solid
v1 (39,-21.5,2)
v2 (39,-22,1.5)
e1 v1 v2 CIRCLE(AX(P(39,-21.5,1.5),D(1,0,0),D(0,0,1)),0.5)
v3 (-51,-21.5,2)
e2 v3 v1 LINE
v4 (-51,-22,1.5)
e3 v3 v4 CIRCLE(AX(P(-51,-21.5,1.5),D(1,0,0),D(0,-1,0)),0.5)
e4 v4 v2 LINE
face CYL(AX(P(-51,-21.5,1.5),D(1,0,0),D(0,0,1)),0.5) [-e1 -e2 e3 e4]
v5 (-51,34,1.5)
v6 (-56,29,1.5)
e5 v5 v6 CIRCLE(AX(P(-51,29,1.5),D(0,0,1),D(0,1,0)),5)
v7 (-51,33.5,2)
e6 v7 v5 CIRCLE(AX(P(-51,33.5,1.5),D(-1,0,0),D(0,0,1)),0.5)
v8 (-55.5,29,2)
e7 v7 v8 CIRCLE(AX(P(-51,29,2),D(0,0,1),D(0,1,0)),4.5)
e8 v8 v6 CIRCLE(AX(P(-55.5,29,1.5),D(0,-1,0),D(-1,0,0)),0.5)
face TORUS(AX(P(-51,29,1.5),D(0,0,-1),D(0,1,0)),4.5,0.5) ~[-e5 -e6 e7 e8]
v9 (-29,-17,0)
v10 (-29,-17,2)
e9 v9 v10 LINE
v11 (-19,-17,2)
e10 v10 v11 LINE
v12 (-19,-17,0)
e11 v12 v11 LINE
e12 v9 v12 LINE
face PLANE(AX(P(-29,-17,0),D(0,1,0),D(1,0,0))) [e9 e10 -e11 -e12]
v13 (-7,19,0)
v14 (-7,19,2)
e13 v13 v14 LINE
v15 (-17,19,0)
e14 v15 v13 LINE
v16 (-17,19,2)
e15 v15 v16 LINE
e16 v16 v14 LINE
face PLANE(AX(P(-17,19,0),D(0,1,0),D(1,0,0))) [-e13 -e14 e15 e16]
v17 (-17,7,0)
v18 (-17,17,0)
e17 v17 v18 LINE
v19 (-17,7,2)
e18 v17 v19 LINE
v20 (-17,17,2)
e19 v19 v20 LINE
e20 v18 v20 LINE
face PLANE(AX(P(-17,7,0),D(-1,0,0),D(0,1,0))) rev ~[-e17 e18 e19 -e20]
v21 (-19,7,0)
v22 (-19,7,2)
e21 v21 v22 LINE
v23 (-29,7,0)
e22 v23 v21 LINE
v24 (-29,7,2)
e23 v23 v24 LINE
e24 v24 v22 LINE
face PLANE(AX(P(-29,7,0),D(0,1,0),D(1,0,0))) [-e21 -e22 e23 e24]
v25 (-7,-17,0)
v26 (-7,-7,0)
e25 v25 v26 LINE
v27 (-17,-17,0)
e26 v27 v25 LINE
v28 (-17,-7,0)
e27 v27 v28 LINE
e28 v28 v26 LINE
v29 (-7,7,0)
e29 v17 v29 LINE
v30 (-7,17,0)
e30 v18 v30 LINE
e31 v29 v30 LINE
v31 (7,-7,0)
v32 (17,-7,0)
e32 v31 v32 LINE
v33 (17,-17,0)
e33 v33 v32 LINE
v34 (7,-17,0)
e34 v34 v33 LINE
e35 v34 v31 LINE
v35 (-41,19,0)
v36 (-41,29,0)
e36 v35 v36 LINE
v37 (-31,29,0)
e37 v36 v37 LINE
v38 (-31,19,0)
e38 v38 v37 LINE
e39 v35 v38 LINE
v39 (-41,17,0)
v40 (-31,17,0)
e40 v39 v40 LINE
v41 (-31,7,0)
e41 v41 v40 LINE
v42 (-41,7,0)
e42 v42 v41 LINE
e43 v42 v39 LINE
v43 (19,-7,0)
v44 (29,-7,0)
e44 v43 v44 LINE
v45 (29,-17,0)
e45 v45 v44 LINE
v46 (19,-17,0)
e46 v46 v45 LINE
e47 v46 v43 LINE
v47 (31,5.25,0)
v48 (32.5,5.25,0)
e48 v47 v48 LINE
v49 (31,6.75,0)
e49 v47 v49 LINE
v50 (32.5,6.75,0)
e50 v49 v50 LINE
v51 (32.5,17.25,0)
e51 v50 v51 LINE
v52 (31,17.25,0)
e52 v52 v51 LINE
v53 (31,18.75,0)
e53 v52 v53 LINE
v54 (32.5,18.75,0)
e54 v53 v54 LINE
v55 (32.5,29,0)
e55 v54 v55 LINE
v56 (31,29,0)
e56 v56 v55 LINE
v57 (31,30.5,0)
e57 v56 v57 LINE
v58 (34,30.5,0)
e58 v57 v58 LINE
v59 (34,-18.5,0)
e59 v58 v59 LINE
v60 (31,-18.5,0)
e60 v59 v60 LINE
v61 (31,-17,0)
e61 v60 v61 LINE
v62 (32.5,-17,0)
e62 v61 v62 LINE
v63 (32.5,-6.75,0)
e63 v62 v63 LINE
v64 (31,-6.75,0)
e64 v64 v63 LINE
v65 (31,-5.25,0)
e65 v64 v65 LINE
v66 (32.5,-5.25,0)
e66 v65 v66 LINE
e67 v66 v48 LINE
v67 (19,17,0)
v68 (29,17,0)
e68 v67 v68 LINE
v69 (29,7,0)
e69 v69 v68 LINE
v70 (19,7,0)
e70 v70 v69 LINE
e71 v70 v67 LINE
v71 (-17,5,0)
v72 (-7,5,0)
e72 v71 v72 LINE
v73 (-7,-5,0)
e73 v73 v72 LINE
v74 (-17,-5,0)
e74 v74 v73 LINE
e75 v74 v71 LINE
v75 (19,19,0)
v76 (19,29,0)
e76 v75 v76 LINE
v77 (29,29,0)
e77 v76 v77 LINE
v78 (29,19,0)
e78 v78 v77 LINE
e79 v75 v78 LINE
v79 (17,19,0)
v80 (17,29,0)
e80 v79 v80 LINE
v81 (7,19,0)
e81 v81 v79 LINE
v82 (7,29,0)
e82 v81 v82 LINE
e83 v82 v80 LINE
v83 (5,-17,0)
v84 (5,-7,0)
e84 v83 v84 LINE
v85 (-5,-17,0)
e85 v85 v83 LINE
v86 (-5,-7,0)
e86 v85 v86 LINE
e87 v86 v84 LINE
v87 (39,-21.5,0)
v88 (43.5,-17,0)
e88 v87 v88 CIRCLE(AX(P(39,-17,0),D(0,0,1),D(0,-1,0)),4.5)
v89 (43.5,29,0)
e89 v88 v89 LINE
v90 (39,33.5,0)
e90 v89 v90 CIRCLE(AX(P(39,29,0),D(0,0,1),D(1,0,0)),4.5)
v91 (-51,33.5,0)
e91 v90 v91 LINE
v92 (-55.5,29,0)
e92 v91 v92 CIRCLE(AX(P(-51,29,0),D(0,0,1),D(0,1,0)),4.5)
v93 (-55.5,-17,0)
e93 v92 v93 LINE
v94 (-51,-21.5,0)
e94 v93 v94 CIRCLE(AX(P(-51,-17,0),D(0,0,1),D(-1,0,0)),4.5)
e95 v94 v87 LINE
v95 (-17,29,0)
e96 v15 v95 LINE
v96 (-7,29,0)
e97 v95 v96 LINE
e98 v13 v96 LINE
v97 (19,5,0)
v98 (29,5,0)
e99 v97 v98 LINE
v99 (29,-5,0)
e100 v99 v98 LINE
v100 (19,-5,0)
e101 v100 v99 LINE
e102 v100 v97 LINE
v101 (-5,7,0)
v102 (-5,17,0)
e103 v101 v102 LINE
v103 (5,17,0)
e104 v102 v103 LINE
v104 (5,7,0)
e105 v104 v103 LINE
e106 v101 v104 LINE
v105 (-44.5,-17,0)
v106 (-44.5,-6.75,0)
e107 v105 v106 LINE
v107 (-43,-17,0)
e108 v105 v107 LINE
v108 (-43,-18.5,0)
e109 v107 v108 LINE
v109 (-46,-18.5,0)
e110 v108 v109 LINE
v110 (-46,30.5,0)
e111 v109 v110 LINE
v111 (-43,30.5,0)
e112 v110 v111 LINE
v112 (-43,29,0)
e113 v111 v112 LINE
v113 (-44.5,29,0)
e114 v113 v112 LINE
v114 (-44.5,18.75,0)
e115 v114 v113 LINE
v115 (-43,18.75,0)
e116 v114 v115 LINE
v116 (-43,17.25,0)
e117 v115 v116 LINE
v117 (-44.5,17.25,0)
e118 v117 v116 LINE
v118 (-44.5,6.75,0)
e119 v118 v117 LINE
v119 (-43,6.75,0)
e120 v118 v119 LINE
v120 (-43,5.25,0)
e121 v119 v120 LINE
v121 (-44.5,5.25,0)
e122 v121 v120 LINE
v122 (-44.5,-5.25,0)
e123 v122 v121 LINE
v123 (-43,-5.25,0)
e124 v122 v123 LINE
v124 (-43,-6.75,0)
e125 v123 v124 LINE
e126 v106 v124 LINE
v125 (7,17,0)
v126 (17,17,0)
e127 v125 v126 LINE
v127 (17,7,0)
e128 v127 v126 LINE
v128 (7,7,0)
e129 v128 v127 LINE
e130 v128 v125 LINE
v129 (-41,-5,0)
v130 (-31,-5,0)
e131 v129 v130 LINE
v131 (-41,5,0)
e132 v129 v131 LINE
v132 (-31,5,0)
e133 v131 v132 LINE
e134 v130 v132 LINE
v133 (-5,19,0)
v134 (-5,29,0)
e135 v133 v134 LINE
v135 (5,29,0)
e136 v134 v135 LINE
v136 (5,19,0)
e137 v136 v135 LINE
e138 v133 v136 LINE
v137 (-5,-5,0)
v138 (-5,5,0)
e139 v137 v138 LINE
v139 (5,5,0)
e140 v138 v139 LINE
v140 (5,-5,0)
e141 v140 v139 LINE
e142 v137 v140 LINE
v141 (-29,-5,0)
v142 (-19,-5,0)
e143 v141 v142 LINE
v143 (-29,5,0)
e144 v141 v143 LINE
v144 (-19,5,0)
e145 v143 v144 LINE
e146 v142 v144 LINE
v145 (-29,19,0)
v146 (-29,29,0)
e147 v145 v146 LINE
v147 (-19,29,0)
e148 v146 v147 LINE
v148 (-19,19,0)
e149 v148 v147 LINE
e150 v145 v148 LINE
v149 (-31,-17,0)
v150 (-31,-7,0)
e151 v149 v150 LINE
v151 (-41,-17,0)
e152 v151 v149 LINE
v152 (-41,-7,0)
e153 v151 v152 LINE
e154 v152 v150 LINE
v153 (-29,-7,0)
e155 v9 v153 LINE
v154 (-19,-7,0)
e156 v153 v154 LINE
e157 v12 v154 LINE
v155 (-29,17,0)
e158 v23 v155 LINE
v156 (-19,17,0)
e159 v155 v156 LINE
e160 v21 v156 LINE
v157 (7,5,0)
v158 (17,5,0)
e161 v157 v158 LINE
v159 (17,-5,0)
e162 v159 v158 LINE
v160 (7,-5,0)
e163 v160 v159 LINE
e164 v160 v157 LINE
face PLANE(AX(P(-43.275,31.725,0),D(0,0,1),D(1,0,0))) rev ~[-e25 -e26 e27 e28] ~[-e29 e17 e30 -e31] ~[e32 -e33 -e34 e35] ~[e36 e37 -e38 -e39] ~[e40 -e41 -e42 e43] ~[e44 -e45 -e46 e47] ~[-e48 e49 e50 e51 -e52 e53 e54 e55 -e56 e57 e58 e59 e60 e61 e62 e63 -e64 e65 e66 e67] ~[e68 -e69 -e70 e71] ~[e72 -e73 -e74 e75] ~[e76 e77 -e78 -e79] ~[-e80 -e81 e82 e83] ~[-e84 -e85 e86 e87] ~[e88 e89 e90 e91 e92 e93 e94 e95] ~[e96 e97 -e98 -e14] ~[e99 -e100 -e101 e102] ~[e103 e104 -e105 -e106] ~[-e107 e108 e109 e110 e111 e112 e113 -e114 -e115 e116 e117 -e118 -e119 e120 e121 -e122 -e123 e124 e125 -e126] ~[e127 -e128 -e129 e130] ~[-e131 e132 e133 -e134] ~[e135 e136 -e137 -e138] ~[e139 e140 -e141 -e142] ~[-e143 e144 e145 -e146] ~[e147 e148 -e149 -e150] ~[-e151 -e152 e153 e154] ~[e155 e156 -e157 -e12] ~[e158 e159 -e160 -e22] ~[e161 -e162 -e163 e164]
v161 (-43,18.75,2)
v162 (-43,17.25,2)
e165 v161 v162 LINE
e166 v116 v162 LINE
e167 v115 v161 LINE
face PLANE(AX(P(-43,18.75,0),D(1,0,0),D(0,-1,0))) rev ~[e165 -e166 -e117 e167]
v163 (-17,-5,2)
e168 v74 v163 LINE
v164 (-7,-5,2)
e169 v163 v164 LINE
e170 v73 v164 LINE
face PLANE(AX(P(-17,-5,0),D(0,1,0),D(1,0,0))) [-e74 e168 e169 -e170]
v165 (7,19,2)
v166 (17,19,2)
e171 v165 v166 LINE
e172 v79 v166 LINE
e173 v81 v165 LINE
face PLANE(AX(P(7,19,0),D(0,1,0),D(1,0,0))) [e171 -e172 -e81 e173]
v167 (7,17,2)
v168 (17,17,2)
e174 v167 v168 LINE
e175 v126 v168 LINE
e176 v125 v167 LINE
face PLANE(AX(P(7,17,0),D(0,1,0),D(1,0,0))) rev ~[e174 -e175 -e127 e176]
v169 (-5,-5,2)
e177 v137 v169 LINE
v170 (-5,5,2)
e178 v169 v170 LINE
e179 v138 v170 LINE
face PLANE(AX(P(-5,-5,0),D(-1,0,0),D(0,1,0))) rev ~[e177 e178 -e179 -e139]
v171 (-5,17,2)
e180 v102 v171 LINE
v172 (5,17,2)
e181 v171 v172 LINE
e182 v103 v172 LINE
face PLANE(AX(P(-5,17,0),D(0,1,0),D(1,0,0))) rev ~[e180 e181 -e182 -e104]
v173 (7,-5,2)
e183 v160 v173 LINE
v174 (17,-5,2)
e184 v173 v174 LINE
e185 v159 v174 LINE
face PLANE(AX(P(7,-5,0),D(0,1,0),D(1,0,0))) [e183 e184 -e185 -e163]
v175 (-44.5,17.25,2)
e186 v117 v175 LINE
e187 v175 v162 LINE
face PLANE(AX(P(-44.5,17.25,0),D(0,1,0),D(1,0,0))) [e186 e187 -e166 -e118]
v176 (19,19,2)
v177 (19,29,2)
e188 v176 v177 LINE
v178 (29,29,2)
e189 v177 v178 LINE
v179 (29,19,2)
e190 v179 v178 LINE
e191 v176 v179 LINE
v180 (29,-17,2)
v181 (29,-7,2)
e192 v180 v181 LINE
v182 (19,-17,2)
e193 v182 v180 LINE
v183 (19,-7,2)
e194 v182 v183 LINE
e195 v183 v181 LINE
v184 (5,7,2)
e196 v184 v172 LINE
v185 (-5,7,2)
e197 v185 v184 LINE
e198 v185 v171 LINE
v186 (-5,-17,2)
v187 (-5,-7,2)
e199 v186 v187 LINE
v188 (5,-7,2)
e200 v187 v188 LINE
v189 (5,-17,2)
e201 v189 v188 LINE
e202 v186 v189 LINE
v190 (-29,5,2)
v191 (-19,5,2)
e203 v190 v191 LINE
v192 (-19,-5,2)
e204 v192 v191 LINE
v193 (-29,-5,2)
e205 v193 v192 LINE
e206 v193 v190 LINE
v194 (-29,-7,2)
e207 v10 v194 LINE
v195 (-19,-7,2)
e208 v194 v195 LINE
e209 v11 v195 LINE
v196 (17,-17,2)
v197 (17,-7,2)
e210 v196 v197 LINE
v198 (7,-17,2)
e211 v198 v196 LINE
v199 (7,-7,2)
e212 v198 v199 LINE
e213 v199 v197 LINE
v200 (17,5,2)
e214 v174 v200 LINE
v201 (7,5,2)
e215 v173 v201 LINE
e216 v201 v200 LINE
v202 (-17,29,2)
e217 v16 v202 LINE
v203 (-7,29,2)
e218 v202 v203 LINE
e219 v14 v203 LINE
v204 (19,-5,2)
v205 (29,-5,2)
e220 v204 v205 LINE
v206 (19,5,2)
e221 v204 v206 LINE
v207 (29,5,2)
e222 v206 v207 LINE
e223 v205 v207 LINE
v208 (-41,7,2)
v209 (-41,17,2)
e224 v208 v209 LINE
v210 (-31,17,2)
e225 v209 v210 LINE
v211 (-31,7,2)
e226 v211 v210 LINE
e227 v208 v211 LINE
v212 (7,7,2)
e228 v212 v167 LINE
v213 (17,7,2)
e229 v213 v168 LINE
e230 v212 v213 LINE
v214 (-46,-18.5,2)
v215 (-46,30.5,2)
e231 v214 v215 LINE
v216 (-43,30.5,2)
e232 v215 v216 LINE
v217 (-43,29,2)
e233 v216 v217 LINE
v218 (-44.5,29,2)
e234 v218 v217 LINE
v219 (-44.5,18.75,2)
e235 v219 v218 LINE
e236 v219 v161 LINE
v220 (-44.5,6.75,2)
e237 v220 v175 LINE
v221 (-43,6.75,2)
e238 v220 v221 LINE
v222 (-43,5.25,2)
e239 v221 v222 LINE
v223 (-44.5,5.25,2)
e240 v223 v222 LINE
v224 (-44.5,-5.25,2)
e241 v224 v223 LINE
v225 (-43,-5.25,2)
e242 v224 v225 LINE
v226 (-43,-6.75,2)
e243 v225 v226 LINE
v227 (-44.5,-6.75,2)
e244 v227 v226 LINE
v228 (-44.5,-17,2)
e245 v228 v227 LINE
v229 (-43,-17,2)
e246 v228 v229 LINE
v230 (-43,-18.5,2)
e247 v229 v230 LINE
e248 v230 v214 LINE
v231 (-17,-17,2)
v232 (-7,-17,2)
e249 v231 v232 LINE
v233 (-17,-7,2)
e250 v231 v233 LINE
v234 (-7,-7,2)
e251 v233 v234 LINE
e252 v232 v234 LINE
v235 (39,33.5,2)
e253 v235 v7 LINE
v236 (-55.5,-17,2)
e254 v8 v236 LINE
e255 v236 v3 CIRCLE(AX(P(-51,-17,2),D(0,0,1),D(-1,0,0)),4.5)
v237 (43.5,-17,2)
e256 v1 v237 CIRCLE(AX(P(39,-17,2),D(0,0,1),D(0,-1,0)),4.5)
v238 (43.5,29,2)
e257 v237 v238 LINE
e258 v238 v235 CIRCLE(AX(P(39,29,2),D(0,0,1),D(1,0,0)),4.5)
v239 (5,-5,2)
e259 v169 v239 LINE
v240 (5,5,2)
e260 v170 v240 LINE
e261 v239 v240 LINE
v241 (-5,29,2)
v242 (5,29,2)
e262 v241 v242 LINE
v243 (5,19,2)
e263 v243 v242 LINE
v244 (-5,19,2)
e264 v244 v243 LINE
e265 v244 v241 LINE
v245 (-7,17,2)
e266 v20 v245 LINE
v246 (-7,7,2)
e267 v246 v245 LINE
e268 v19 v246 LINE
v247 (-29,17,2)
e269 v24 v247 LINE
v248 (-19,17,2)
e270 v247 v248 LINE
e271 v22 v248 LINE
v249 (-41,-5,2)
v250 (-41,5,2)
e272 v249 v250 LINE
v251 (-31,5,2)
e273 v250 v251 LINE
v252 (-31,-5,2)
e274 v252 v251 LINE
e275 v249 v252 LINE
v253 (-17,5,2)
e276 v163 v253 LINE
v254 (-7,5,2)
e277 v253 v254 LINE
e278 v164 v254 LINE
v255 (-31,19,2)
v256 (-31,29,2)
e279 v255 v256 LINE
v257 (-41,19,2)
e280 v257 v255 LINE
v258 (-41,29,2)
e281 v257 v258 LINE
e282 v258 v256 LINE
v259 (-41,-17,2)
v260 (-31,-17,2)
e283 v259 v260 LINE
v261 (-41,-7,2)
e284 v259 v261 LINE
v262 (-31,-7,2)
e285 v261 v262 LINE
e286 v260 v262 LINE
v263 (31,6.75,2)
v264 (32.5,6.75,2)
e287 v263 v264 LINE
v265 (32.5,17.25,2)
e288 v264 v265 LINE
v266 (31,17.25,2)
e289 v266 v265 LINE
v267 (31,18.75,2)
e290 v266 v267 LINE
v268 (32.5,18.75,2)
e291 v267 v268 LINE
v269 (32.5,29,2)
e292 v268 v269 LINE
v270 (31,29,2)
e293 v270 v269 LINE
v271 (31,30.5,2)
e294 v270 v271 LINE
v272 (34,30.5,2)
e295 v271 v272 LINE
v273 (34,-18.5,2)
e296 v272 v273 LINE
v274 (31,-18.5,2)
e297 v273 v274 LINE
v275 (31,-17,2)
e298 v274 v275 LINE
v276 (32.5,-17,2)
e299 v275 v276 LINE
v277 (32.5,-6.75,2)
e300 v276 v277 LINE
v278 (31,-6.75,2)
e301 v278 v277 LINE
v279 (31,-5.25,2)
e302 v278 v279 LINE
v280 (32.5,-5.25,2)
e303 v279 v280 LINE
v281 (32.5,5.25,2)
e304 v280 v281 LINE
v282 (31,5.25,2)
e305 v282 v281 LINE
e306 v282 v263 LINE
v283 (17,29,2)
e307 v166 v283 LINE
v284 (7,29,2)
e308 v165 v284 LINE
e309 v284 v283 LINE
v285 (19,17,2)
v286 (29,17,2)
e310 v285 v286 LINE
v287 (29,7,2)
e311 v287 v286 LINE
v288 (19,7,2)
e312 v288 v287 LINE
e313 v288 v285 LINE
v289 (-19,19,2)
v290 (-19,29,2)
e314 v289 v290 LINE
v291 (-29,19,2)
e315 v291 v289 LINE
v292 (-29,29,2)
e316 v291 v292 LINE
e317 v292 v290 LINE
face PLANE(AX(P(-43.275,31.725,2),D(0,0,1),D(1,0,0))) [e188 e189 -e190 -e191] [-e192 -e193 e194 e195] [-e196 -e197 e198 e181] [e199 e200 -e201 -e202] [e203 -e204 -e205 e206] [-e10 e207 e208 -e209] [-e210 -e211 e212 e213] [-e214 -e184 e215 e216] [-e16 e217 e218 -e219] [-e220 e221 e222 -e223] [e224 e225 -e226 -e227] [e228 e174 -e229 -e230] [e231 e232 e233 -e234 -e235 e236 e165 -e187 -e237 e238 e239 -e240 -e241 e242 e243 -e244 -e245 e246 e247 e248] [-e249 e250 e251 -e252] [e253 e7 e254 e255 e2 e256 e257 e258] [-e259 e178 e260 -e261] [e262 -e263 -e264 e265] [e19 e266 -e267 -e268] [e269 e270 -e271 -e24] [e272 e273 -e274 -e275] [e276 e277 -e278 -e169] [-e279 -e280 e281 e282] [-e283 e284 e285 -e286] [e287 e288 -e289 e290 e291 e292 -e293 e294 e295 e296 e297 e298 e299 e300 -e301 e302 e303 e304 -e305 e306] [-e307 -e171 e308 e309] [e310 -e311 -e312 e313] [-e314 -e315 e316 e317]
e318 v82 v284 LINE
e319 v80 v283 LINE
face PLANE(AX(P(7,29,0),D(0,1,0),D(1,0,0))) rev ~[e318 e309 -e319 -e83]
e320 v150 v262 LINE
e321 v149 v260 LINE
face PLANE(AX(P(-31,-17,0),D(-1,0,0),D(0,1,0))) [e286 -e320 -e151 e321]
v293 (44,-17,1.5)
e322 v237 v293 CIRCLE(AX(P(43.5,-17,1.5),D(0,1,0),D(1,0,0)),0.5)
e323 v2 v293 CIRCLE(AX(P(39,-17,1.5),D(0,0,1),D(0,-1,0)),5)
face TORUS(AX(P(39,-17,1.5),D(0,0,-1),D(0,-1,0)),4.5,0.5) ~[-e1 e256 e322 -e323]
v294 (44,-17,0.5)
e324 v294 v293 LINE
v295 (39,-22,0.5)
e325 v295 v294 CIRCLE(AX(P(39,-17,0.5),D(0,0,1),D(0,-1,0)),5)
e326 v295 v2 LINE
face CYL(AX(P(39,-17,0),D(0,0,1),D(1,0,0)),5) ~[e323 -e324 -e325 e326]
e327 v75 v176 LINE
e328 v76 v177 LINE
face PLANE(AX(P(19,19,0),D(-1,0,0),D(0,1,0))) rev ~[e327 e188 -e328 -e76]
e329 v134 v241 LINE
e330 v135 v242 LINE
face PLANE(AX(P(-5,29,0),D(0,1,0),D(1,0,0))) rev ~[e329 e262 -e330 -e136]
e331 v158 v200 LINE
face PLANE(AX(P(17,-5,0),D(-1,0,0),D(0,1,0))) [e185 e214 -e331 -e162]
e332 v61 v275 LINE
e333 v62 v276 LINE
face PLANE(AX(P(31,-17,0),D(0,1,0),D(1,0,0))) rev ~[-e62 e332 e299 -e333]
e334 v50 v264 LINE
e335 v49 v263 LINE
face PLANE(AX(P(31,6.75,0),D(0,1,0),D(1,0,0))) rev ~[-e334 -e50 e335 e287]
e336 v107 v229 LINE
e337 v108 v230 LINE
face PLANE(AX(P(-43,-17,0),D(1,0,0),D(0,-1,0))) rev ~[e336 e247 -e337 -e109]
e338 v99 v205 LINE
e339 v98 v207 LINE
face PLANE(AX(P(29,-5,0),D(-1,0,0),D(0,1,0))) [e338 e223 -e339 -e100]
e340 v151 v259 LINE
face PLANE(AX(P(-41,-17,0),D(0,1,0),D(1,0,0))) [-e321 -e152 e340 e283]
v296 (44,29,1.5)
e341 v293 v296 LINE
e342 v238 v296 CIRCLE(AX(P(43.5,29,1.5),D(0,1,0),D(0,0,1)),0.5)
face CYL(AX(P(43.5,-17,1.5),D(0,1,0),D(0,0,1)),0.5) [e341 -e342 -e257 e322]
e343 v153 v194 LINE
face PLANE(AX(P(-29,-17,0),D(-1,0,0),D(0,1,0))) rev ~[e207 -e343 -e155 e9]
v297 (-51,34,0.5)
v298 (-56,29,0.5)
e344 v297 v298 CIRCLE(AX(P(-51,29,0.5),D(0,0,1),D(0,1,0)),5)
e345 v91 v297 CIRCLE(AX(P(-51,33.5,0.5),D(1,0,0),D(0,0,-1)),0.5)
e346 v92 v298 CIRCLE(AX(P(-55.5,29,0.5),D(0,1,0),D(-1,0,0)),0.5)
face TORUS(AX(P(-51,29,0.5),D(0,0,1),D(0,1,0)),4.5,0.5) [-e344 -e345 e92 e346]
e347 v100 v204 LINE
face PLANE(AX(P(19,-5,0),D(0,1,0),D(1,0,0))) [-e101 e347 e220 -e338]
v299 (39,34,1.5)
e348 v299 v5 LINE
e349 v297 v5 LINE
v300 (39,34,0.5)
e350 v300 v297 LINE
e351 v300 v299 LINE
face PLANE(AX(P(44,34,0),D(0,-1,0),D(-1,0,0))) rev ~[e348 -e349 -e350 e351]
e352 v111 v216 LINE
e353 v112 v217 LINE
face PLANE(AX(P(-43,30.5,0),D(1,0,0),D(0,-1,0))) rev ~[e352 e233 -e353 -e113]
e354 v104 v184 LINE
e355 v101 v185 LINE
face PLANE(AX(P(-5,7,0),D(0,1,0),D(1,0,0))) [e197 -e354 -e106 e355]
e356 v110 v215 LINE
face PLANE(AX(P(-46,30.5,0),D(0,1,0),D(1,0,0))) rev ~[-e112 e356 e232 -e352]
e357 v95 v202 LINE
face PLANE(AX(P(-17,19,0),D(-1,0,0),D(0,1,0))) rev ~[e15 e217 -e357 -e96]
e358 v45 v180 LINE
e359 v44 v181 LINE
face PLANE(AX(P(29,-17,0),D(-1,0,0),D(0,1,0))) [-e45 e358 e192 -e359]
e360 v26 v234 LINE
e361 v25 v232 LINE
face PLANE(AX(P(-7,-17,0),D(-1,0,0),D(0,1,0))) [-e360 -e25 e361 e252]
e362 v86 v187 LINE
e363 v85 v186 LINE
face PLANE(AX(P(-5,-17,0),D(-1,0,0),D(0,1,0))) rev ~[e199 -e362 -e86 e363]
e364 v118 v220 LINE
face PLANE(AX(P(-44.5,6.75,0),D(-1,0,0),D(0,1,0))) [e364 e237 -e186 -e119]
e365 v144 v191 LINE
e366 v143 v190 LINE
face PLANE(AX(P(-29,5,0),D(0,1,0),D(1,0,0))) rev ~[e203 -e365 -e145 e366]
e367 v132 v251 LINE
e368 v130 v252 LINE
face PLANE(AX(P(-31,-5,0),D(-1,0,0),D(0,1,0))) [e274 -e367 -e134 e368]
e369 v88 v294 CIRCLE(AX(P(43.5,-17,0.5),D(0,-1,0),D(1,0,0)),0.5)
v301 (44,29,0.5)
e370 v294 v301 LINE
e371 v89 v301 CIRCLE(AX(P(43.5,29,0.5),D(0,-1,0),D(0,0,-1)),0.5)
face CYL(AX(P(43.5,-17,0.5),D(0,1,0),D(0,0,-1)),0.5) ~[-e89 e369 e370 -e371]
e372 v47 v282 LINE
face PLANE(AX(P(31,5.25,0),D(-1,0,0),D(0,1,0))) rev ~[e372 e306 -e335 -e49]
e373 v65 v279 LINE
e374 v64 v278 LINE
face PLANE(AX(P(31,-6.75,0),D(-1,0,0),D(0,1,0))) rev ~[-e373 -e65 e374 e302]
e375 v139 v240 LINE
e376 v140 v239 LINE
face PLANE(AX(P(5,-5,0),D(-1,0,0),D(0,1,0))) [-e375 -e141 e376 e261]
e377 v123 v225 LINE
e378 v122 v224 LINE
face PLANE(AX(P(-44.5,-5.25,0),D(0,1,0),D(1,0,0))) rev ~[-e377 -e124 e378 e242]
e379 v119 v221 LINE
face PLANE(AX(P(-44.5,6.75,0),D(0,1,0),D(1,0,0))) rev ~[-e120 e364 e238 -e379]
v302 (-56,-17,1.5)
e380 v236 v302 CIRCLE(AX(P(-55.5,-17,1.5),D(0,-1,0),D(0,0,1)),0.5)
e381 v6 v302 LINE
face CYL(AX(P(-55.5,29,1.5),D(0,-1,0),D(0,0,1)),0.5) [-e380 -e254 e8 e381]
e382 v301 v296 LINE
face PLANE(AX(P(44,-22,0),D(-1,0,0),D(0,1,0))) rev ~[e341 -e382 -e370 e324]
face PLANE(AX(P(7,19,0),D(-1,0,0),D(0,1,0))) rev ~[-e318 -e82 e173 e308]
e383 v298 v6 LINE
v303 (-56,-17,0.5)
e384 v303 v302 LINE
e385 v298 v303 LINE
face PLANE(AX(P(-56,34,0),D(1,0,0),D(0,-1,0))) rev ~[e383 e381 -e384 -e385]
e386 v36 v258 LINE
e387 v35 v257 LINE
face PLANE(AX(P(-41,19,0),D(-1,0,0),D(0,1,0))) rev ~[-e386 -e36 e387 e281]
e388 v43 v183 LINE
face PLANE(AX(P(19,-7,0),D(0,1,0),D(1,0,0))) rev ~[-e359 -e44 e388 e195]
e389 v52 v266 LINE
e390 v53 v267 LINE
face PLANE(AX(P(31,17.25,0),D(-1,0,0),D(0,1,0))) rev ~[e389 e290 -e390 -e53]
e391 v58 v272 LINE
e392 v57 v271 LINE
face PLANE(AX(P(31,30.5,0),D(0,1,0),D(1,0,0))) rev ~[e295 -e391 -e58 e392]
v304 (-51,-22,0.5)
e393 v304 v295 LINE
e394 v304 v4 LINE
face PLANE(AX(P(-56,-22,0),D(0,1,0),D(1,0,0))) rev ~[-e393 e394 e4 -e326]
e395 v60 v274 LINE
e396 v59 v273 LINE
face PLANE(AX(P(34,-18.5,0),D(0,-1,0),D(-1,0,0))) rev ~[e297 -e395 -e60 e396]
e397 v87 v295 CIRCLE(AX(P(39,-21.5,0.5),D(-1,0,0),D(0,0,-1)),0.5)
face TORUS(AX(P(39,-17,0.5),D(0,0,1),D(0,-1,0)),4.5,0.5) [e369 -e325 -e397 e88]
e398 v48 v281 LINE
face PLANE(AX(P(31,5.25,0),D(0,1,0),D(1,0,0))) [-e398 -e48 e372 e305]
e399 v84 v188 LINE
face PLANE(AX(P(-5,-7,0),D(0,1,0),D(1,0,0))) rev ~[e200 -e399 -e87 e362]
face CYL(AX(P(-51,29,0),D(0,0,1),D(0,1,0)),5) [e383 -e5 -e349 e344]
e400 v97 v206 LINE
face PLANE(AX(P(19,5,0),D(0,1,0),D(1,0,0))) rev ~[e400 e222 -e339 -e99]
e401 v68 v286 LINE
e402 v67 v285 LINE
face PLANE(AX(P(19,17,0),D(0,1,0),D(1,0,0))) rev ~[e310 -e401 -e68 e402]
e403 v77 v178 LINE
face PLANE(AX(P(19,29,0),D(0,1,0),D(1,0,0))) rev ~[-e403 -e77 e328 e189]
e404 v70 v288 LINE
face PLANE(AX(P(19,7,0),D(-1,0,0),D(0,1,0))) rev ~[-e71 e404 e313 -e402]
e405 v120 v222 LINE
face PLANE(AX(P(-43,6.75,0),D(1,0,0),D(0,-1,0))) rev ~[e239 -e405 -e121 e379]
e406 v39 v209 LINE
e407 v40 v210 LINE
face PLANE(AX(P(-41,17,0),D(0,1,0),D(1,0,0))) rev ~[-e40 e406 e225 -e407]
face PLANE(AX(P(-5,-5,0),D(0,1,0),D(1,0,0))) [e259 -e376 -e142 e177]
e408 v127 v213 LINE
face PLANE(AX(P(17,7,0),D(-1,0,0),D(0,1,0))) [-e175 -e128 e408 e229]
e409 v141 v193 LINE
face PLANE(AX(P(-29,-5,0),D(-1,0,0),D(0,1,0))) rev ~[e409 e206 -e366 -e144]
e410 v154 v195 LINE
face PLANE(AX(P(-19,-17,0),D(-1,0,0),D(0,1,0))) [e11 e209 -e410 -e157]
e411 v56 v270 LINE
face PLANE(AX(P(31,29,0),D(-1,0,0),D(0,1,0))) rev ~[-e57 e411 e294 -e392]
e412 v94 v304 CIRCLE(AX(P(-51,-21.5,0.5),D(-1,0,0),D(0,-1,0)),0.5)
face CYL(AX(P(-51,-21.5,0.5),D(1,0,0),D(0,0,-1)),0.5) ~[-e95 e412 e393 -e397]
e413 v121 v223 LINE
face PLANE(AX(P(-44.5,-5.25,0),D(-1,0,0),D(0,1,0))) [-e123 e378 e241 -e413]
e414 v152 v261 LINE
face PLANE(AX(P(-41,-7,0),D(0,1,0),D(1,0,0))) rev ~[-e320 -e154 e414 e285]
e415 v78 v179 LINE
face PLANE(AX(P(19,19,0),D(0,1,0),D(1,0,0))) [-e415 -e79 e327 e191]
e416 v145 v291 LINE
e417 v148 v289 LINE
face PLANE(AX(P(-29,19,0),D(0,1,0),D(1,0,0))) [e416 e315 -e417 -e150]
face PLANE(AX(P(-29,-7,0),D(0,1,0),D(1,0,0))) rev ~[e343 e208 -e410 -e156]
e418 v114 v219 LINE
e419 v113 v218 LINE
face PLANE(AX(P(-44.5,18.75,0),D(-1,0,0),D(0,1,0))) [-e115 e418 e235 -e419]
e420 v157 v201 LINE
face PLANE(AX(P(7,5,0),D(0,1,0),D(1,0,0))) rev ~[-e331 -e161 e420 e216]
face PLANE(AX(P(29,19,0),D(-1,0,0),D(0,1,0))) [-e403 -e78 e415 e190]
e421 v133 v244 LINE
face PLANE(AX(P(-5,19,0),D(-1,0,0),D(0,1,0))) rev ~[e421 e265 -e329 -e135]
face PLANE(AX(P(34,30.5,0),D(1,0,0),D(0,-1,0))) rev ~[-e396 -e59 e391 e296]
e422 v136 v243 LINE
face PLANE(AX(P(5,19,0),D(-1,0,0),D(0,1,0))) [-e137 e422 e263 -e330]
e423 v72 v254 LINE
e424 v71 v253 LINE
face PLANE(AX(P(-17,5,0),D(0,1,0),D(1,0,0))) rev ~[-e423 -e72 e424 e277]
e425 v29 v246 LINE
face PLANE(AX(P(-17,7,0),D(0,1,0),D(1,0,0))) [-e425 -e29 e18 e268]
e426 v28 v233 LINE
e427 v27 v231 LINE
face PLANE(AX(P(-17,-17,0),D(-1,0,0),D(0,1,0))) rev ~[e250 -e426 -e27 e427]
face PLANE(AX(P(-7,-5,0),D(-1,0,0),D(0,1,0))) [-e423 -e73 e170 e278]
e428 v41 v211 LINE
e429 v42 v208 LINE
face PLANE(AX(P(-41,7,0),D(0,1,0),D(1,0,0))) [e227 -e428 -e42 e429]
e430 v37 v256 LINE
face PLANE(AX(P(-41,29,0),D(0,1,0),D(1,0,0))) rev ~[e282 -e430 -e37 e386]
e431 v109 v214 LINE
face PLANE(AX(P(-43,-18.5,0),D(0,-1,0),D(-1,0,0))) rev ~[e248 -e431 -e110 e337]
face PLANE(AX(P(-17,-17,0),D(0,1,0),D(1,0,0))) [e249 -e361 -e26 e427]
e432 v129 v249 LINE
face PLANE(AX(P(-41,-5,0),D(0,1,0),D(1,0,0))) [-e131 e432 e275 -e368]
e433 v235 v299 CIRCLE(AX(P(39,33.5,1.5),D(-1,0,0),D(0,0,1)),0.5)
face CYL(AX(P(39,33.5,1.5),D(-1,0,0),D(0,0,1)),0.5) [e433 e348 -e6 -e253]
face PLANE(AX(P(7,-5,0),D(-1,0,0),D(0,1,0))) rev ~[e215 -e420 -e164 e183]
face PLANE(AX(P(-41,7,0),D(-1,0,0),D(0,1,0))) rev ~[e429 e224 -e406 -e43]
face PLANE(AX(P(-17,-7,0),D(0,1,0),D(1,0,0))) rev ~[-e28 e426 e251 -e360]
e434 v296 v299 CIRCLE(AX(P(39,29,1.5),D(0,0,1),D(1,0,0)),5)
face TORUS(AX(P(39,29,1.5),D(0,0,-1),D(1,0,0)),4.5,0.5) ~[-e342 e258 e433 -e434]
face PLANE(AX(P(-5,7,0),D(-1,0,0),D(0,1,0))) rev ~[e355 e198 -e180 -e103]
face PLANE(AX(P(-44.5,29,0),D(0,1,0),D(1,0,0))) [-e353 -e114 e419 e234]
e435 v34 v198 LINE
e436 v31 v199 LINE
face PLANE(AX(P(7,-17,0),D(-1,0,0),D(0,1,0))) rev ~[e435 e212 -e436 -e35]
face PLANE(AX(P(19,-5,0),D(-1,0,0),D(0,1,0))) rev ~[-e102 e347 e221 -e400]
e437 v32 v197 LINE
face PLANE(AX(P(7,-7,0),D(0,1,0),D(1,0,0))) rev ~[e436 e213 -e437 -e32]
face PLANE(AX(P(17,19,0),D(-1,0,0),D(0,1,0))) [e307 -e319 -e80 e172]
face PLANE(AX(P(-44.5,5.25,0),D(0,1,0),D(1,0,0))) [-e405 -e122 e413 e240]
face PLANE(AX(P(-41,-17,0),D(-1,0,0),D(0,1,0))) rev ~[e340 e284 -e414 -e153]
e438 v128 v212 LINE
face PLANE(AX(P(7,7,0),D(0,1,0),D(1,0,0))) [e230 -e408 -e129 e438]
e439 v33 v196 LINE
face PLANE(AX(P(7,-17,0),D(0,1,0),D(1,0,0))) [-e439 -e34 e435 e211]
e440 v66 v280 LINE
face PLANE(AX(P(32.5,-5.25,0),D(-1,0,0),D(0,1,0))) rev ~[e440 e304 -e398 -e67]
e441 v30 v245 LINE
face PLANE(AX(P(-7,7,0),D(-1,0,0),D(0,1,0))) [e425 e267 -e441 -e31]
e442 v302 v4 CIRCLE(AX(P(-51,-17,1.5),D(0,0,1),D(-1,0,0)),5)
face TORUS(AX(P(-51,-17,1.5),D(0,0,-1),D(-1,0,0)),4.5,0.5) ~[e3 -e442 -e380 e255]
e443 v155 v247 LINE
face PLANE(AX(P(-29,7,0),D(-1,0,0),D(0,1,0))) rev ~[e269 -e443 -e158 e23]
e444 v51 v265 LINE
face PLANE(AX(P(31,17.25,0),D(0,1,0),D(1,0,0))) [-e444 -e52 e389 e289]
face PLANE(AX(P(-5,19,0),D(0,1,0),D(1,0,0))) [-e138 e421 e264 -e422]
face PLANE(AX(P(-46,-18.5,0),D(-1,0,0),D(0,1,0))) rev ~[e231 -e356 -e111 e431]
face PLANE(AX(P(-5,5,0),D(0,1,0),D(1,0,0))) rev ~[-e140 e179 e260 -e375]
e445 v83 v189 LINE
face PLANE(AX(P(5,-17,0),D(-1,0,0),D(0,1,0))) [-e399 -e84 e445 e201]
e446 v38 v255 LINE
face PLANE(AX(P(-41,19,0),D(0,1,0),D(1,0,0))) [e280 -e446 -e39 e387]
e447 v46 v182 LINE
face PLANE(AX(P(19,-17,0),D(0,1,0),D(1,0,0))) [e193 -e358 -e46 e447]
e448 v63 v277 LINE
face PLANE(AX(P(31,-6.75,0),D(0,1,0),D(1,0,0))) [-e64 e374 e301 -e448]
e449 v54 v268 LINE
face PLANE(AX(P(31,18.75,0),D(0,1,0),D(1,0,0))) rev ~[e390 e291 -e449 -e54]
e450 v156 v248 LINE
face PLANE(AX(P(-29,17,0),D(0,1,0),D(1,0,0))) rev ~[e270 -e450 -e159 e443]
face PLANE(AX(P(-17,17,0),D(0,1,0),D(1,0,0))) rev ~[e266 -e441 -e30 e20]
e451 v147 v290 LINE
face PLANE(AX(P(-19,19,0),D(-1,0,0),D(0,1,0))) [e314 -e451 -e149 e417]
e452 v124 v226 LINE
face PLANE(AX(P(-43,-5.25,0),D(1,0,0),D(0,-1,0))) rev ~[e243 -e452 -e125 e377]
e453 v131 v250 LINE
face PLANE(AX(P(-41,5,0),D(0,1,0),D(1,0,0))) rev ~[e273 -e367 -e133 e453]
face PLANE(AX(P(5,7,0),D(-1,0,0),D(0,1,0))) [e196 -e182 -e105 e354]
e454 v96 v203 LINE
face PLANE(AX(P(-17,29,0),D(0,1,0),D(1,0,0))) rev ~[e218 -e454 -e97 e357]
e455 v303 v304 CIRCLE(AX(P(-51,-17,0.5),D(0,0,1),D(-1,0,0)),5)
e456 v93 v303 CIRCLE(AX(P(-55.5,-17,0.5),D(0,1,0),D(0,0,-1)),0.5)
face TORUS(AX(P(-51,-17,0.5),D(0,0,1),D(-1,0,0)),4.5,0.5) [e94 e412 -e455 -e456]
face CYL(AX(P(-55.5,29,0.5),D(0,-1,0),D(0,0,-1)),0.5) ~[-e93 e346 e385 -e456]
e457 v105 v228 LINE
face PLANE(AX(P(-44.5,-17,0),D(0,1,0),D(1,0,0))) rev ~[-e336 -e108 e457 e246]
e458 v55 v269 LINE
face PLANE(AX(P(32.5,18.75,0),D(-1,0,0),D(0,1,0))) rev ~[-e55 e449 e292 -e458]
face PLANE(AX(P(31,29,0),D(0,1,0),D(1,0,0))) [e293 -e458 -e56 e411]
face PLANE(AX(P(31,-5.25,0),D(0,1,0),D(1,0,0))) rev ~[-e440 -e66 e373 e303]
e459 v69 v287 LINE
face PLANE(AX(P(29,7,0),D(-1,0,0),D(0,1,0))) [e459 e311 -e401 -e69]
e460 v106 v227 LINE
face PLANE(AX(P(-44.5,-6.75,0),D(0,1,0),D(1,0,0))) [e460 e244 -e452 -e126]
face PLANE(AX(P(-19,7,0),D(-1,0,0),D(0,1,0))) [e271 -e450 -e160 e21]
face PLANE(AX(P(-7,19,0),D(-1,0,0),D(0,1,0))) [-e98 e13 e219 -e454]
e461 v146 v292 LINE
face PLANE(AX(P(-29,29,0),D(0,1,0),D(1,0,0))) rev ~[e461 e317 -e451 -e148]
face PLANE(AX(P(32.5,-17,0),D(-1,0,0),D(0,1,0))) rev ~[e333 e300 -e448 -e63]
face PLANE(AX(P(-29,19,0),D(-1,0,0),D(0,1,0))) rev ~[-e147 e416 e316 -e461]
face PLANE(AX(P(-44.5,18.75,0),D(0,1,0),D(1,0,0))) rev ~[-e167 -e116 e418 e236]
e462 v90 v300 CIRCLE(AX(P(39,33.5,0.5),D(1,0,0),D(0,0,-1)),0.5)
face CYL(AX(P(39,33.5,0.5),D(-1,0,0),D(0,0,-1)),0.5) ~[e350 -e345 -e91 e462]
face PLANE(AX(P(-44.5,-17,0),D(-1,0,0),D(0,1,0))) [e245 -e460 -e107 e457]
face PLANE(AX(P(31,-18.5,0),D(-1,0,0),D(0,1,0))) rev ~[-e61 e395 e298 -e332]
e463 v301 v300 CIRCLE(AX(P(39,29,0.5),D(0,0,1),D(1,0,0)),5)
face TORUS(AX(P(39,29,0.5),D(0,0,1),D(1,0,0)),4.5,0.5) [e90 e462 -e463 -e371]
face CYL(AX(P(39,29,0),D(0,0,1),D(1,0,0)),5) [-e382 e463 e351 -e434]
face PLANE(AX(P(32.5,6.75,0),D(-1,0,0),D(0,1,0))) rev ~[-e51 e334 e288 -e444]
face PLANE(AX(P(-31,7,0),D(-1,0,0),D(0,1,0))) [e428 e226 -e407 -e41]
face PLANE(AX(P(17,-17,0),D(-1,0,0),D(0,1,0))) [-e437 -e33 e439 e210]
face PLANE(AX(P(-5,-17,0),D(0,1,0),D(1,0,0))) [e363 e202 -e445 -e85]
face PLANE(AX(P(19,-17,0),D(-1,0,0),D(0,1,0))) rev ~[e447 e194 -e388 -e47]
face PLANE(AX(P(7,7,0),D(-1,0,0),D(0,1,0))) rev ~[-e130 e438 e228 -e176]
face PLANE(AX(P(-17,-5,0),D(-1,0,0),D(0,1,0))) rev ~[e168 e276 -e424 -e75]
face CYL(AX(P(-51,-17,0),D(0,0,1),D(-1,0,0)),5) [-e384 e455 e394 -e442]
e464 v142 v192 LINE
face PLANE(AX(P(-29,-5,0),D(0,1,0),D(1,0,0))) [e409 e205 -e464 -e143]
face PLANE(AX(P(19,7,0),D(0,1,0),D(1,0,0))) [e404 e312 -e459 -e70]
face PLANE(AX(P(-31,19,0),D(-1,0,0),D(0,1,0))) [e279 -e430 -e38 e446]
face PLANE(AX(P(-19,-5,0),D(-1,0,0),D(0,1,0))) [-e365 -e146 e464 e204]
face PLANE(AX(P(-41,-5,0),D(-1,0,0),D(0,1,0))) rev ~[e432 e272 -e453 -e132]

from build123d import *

# Parameters (mm, degrees)
F0_W     = 10
F0_H     = 10
F0_H_2   = 46
F0_W_2   = 1.5
F0_H_3   = 10.5
F0_H_4   = 10.25
F1_DEPTH = 2
F2_R     = 5
F4_R     = 0.5


# Not quite as in the source:
# - two fillets or chamfers of one size are made in one step


with BuildPart() as f1:
    # F0 (on Top) → F1 (new body)
    with BuildSketch(Plane.XY):
        Polygon((-43, 29), (-41, 29), (-41, 34), (-46, 34), (-46, 30.5), (-43, 30.5), align=None)
        Polygon((-41, 34), (-41, 29), (-43, 29), (-43, 18.75), (-43, 17.25), (-43, 6.75), (-43, 5.25), (-43, -5.25), (-43, -6.75), (-43, -17), (-43, -18.5), (-46, -18.5), (-46, -22), (29, -22), (29, -17), (31, -17), (31, -6.75), (31, -5.25), (31, 5.25), (31, 6.75), (31, 17.25), (31, 18.75), (31, 29), (31, 30.5), (34, 30.5), (34, 34), align=None)
        with Locations((-36, -12)):
            Rectangle(F0_W, F0_H, mode=Mode.SUBTRACT)
        with Locations((-24, -12)):
            Rectangle(F0_W, F0_H, mode=Mode.SUBTRACT)
        with Locations((-12, -12)):
            Rectangle(F0_W, F0_H, mode=Mode.SUBTRACT)
        with Locations((-36, 0)):
            Rectangle(F0_W, F0_H, mode=Mode.SUBTRACT)
        with Locations((-24, 0)):
            Rectangle(F0_W, F0_H, mode=Mode.SUBTRACT)
        with Locations((-12, 0)):
            Rectangle(F0_W, F0_H, mode=Mode.SUBTRACT)
        with Locations((0, -12)):
            Rectangle(F0_W, F0_H, mode=Mode.SUBTRACT)
        with Locations((12, -12)):
            Rectangle(F0_W, F0_H, mode=Mode.SUBTRACT)
        with Locations((24, -12)):
            Rectangle(F0_W, F0_H, mode=Mode.SUBTRACT)
        Rectangle(F0_W, F0_H, mode=Mode.SUBTRACT)
        with Locations((12, 0)):
            Rectangle(F0_W, F0_H, mode=Mode.SUBTRACT)
        with Locations((24, 0)):
            Rectangle(F0_W, F0_H, mode=Mode.SUBTRACT)
        with Locations((-36, 12)):
            Rectangle(F0_W, F0_H, mode=Mode.SUBTRACT)
        with Locations((-24, 12)):
            Rectangle(F0_W, F0_H, mode=Mode.SUBTRACT)
        with Locations((-12, 12)):
            Rectangle(F0_W, F0_H, mode=Mode.SUBTRACT)
        with Locations((-36, 24)):
            Rectangle(F0_W, F0_H, mode=Mode.SUBTRACT)
        with Locations((-24, 24)):
            Rectangle(F0_W, F0_H, mode=Mode.SUBTRACT)
        with Locations((-12, 24)):
            Rectangle(F0_W, F0_H, mode=Mode.SUBTRACT)
        with Locations((0, 12)):
            Rectangle(F0_W, F0_H, mode=Mode.SUBTRACT)
        with Locations((12, 12)):
            Rectangle(F0_W, F0_H, mode=Mode.SUBTRACT)
        with Locations((24, 12)):
            Rectangle(F0_W, F0_H, mode=Mode.SUBTRACT)
        with Locations((0, 24)):
            Rectangle(F0_W, F0_H, mode=Mode.SUBTRACT)
        with Locations((12, 24)):
            Rectangle(F0_W, F0_H, mode=Mode.SUBTRACT)
        with Locations((24, 24)):
            Rectangle(F0_W, F0_H, mode=Mode.SUBTRACT)
        Polygon((44, 34), (34, 34), (34, 30.5), (34, 29), (44, 29), align=None)
        with Locations((39, 6)):
            Rectangle(F0_W, F0_H_2)
        Polygon((44, -22), (44, -17), (34, -17), (34, -18.5), (34, -22), align=None)
        Polygon((34, -22), (34, -18.5), (31, -18.5), (31, -17), (29, -17), (29, -22), align=None)
        with Locations((31.75, 0)):
            Rectangle(F0_W_2, F0_H_3)
        with Locations((31.75, 12)):
            Rectangle(F0_W_2, F0_H_3)
        with Locations((-51, 6)):
            Rectangle(F0_W, F0_H_2)
        Polygon((-46, -18.5), (-46, -17), (-56, -17), (-56, -22), (-46, -22), align=None)
        Polygon((-46, 30.5), (-46, 34), (-56, 34), (-56, 29), (-46, 29), align=None)
        with Locations((-43.75, 23.875)):
            Rectangle(F0_W_2, F0_H_4)
        with Locations((-43.75, 12)):
            Rectangle(F0_W_2, F0_H_3)
        with Locations((-43.75, 0)):
            Rectangle(F0_W_2, F0_H_3)
        with Locations((-43.75, -11.875)):
            Rectangle(F0_W_2, F0_H_4)
        with Locations((31.75, 23.875)):
            Rectangle(F0_W_2, F0_H_4)
        with Locations((31.75, -11.875)):
            Rectangle(F0_W_2, F0_H_4)
    extrude(amount=F1_DEPTH)

    # F2
    f2_edges = [f1.edges().sort_by_distance(p)[0] for p in [
        (44, -22, 1),
        (44, 34, 1),
        (-56, 34, 1),
        (-56, -22, 1),
    ]]
    fillet(f2_edges, radius=F2_R)

    # F4
    f4_edges = [f1.edges().sort_by_distance(p)[0] for p in [
        (-6, 34, 2),
        (-6, 34, 0),
        (-51, 34, 1),
        (39, 34, 1),
        (44, 6, 2),
        (44, 29, 1),
        (44, 6, 0),
        (42.535534, 32.535534, 2),
        (-6, -22, 2),
        (42.535534, 32.535534, 0),
        (-6, -22, 0),
        (-56, 6, 2),
        (-54.535534, 32.535534, 2),
        (-56, 6, 0),
        (-56, 29, 1),
        (-54.535534, 32.535534, 0),
        (42.535534, -20.535534, 0),
        (-54.535534, -20.535534, 0),
        (42.535534, -20.535534, 2),
        (-54.535534, -20.535534, 2),
    ]]
    fillet(f4_edges, radius=F4_R)


solid = f1.part
